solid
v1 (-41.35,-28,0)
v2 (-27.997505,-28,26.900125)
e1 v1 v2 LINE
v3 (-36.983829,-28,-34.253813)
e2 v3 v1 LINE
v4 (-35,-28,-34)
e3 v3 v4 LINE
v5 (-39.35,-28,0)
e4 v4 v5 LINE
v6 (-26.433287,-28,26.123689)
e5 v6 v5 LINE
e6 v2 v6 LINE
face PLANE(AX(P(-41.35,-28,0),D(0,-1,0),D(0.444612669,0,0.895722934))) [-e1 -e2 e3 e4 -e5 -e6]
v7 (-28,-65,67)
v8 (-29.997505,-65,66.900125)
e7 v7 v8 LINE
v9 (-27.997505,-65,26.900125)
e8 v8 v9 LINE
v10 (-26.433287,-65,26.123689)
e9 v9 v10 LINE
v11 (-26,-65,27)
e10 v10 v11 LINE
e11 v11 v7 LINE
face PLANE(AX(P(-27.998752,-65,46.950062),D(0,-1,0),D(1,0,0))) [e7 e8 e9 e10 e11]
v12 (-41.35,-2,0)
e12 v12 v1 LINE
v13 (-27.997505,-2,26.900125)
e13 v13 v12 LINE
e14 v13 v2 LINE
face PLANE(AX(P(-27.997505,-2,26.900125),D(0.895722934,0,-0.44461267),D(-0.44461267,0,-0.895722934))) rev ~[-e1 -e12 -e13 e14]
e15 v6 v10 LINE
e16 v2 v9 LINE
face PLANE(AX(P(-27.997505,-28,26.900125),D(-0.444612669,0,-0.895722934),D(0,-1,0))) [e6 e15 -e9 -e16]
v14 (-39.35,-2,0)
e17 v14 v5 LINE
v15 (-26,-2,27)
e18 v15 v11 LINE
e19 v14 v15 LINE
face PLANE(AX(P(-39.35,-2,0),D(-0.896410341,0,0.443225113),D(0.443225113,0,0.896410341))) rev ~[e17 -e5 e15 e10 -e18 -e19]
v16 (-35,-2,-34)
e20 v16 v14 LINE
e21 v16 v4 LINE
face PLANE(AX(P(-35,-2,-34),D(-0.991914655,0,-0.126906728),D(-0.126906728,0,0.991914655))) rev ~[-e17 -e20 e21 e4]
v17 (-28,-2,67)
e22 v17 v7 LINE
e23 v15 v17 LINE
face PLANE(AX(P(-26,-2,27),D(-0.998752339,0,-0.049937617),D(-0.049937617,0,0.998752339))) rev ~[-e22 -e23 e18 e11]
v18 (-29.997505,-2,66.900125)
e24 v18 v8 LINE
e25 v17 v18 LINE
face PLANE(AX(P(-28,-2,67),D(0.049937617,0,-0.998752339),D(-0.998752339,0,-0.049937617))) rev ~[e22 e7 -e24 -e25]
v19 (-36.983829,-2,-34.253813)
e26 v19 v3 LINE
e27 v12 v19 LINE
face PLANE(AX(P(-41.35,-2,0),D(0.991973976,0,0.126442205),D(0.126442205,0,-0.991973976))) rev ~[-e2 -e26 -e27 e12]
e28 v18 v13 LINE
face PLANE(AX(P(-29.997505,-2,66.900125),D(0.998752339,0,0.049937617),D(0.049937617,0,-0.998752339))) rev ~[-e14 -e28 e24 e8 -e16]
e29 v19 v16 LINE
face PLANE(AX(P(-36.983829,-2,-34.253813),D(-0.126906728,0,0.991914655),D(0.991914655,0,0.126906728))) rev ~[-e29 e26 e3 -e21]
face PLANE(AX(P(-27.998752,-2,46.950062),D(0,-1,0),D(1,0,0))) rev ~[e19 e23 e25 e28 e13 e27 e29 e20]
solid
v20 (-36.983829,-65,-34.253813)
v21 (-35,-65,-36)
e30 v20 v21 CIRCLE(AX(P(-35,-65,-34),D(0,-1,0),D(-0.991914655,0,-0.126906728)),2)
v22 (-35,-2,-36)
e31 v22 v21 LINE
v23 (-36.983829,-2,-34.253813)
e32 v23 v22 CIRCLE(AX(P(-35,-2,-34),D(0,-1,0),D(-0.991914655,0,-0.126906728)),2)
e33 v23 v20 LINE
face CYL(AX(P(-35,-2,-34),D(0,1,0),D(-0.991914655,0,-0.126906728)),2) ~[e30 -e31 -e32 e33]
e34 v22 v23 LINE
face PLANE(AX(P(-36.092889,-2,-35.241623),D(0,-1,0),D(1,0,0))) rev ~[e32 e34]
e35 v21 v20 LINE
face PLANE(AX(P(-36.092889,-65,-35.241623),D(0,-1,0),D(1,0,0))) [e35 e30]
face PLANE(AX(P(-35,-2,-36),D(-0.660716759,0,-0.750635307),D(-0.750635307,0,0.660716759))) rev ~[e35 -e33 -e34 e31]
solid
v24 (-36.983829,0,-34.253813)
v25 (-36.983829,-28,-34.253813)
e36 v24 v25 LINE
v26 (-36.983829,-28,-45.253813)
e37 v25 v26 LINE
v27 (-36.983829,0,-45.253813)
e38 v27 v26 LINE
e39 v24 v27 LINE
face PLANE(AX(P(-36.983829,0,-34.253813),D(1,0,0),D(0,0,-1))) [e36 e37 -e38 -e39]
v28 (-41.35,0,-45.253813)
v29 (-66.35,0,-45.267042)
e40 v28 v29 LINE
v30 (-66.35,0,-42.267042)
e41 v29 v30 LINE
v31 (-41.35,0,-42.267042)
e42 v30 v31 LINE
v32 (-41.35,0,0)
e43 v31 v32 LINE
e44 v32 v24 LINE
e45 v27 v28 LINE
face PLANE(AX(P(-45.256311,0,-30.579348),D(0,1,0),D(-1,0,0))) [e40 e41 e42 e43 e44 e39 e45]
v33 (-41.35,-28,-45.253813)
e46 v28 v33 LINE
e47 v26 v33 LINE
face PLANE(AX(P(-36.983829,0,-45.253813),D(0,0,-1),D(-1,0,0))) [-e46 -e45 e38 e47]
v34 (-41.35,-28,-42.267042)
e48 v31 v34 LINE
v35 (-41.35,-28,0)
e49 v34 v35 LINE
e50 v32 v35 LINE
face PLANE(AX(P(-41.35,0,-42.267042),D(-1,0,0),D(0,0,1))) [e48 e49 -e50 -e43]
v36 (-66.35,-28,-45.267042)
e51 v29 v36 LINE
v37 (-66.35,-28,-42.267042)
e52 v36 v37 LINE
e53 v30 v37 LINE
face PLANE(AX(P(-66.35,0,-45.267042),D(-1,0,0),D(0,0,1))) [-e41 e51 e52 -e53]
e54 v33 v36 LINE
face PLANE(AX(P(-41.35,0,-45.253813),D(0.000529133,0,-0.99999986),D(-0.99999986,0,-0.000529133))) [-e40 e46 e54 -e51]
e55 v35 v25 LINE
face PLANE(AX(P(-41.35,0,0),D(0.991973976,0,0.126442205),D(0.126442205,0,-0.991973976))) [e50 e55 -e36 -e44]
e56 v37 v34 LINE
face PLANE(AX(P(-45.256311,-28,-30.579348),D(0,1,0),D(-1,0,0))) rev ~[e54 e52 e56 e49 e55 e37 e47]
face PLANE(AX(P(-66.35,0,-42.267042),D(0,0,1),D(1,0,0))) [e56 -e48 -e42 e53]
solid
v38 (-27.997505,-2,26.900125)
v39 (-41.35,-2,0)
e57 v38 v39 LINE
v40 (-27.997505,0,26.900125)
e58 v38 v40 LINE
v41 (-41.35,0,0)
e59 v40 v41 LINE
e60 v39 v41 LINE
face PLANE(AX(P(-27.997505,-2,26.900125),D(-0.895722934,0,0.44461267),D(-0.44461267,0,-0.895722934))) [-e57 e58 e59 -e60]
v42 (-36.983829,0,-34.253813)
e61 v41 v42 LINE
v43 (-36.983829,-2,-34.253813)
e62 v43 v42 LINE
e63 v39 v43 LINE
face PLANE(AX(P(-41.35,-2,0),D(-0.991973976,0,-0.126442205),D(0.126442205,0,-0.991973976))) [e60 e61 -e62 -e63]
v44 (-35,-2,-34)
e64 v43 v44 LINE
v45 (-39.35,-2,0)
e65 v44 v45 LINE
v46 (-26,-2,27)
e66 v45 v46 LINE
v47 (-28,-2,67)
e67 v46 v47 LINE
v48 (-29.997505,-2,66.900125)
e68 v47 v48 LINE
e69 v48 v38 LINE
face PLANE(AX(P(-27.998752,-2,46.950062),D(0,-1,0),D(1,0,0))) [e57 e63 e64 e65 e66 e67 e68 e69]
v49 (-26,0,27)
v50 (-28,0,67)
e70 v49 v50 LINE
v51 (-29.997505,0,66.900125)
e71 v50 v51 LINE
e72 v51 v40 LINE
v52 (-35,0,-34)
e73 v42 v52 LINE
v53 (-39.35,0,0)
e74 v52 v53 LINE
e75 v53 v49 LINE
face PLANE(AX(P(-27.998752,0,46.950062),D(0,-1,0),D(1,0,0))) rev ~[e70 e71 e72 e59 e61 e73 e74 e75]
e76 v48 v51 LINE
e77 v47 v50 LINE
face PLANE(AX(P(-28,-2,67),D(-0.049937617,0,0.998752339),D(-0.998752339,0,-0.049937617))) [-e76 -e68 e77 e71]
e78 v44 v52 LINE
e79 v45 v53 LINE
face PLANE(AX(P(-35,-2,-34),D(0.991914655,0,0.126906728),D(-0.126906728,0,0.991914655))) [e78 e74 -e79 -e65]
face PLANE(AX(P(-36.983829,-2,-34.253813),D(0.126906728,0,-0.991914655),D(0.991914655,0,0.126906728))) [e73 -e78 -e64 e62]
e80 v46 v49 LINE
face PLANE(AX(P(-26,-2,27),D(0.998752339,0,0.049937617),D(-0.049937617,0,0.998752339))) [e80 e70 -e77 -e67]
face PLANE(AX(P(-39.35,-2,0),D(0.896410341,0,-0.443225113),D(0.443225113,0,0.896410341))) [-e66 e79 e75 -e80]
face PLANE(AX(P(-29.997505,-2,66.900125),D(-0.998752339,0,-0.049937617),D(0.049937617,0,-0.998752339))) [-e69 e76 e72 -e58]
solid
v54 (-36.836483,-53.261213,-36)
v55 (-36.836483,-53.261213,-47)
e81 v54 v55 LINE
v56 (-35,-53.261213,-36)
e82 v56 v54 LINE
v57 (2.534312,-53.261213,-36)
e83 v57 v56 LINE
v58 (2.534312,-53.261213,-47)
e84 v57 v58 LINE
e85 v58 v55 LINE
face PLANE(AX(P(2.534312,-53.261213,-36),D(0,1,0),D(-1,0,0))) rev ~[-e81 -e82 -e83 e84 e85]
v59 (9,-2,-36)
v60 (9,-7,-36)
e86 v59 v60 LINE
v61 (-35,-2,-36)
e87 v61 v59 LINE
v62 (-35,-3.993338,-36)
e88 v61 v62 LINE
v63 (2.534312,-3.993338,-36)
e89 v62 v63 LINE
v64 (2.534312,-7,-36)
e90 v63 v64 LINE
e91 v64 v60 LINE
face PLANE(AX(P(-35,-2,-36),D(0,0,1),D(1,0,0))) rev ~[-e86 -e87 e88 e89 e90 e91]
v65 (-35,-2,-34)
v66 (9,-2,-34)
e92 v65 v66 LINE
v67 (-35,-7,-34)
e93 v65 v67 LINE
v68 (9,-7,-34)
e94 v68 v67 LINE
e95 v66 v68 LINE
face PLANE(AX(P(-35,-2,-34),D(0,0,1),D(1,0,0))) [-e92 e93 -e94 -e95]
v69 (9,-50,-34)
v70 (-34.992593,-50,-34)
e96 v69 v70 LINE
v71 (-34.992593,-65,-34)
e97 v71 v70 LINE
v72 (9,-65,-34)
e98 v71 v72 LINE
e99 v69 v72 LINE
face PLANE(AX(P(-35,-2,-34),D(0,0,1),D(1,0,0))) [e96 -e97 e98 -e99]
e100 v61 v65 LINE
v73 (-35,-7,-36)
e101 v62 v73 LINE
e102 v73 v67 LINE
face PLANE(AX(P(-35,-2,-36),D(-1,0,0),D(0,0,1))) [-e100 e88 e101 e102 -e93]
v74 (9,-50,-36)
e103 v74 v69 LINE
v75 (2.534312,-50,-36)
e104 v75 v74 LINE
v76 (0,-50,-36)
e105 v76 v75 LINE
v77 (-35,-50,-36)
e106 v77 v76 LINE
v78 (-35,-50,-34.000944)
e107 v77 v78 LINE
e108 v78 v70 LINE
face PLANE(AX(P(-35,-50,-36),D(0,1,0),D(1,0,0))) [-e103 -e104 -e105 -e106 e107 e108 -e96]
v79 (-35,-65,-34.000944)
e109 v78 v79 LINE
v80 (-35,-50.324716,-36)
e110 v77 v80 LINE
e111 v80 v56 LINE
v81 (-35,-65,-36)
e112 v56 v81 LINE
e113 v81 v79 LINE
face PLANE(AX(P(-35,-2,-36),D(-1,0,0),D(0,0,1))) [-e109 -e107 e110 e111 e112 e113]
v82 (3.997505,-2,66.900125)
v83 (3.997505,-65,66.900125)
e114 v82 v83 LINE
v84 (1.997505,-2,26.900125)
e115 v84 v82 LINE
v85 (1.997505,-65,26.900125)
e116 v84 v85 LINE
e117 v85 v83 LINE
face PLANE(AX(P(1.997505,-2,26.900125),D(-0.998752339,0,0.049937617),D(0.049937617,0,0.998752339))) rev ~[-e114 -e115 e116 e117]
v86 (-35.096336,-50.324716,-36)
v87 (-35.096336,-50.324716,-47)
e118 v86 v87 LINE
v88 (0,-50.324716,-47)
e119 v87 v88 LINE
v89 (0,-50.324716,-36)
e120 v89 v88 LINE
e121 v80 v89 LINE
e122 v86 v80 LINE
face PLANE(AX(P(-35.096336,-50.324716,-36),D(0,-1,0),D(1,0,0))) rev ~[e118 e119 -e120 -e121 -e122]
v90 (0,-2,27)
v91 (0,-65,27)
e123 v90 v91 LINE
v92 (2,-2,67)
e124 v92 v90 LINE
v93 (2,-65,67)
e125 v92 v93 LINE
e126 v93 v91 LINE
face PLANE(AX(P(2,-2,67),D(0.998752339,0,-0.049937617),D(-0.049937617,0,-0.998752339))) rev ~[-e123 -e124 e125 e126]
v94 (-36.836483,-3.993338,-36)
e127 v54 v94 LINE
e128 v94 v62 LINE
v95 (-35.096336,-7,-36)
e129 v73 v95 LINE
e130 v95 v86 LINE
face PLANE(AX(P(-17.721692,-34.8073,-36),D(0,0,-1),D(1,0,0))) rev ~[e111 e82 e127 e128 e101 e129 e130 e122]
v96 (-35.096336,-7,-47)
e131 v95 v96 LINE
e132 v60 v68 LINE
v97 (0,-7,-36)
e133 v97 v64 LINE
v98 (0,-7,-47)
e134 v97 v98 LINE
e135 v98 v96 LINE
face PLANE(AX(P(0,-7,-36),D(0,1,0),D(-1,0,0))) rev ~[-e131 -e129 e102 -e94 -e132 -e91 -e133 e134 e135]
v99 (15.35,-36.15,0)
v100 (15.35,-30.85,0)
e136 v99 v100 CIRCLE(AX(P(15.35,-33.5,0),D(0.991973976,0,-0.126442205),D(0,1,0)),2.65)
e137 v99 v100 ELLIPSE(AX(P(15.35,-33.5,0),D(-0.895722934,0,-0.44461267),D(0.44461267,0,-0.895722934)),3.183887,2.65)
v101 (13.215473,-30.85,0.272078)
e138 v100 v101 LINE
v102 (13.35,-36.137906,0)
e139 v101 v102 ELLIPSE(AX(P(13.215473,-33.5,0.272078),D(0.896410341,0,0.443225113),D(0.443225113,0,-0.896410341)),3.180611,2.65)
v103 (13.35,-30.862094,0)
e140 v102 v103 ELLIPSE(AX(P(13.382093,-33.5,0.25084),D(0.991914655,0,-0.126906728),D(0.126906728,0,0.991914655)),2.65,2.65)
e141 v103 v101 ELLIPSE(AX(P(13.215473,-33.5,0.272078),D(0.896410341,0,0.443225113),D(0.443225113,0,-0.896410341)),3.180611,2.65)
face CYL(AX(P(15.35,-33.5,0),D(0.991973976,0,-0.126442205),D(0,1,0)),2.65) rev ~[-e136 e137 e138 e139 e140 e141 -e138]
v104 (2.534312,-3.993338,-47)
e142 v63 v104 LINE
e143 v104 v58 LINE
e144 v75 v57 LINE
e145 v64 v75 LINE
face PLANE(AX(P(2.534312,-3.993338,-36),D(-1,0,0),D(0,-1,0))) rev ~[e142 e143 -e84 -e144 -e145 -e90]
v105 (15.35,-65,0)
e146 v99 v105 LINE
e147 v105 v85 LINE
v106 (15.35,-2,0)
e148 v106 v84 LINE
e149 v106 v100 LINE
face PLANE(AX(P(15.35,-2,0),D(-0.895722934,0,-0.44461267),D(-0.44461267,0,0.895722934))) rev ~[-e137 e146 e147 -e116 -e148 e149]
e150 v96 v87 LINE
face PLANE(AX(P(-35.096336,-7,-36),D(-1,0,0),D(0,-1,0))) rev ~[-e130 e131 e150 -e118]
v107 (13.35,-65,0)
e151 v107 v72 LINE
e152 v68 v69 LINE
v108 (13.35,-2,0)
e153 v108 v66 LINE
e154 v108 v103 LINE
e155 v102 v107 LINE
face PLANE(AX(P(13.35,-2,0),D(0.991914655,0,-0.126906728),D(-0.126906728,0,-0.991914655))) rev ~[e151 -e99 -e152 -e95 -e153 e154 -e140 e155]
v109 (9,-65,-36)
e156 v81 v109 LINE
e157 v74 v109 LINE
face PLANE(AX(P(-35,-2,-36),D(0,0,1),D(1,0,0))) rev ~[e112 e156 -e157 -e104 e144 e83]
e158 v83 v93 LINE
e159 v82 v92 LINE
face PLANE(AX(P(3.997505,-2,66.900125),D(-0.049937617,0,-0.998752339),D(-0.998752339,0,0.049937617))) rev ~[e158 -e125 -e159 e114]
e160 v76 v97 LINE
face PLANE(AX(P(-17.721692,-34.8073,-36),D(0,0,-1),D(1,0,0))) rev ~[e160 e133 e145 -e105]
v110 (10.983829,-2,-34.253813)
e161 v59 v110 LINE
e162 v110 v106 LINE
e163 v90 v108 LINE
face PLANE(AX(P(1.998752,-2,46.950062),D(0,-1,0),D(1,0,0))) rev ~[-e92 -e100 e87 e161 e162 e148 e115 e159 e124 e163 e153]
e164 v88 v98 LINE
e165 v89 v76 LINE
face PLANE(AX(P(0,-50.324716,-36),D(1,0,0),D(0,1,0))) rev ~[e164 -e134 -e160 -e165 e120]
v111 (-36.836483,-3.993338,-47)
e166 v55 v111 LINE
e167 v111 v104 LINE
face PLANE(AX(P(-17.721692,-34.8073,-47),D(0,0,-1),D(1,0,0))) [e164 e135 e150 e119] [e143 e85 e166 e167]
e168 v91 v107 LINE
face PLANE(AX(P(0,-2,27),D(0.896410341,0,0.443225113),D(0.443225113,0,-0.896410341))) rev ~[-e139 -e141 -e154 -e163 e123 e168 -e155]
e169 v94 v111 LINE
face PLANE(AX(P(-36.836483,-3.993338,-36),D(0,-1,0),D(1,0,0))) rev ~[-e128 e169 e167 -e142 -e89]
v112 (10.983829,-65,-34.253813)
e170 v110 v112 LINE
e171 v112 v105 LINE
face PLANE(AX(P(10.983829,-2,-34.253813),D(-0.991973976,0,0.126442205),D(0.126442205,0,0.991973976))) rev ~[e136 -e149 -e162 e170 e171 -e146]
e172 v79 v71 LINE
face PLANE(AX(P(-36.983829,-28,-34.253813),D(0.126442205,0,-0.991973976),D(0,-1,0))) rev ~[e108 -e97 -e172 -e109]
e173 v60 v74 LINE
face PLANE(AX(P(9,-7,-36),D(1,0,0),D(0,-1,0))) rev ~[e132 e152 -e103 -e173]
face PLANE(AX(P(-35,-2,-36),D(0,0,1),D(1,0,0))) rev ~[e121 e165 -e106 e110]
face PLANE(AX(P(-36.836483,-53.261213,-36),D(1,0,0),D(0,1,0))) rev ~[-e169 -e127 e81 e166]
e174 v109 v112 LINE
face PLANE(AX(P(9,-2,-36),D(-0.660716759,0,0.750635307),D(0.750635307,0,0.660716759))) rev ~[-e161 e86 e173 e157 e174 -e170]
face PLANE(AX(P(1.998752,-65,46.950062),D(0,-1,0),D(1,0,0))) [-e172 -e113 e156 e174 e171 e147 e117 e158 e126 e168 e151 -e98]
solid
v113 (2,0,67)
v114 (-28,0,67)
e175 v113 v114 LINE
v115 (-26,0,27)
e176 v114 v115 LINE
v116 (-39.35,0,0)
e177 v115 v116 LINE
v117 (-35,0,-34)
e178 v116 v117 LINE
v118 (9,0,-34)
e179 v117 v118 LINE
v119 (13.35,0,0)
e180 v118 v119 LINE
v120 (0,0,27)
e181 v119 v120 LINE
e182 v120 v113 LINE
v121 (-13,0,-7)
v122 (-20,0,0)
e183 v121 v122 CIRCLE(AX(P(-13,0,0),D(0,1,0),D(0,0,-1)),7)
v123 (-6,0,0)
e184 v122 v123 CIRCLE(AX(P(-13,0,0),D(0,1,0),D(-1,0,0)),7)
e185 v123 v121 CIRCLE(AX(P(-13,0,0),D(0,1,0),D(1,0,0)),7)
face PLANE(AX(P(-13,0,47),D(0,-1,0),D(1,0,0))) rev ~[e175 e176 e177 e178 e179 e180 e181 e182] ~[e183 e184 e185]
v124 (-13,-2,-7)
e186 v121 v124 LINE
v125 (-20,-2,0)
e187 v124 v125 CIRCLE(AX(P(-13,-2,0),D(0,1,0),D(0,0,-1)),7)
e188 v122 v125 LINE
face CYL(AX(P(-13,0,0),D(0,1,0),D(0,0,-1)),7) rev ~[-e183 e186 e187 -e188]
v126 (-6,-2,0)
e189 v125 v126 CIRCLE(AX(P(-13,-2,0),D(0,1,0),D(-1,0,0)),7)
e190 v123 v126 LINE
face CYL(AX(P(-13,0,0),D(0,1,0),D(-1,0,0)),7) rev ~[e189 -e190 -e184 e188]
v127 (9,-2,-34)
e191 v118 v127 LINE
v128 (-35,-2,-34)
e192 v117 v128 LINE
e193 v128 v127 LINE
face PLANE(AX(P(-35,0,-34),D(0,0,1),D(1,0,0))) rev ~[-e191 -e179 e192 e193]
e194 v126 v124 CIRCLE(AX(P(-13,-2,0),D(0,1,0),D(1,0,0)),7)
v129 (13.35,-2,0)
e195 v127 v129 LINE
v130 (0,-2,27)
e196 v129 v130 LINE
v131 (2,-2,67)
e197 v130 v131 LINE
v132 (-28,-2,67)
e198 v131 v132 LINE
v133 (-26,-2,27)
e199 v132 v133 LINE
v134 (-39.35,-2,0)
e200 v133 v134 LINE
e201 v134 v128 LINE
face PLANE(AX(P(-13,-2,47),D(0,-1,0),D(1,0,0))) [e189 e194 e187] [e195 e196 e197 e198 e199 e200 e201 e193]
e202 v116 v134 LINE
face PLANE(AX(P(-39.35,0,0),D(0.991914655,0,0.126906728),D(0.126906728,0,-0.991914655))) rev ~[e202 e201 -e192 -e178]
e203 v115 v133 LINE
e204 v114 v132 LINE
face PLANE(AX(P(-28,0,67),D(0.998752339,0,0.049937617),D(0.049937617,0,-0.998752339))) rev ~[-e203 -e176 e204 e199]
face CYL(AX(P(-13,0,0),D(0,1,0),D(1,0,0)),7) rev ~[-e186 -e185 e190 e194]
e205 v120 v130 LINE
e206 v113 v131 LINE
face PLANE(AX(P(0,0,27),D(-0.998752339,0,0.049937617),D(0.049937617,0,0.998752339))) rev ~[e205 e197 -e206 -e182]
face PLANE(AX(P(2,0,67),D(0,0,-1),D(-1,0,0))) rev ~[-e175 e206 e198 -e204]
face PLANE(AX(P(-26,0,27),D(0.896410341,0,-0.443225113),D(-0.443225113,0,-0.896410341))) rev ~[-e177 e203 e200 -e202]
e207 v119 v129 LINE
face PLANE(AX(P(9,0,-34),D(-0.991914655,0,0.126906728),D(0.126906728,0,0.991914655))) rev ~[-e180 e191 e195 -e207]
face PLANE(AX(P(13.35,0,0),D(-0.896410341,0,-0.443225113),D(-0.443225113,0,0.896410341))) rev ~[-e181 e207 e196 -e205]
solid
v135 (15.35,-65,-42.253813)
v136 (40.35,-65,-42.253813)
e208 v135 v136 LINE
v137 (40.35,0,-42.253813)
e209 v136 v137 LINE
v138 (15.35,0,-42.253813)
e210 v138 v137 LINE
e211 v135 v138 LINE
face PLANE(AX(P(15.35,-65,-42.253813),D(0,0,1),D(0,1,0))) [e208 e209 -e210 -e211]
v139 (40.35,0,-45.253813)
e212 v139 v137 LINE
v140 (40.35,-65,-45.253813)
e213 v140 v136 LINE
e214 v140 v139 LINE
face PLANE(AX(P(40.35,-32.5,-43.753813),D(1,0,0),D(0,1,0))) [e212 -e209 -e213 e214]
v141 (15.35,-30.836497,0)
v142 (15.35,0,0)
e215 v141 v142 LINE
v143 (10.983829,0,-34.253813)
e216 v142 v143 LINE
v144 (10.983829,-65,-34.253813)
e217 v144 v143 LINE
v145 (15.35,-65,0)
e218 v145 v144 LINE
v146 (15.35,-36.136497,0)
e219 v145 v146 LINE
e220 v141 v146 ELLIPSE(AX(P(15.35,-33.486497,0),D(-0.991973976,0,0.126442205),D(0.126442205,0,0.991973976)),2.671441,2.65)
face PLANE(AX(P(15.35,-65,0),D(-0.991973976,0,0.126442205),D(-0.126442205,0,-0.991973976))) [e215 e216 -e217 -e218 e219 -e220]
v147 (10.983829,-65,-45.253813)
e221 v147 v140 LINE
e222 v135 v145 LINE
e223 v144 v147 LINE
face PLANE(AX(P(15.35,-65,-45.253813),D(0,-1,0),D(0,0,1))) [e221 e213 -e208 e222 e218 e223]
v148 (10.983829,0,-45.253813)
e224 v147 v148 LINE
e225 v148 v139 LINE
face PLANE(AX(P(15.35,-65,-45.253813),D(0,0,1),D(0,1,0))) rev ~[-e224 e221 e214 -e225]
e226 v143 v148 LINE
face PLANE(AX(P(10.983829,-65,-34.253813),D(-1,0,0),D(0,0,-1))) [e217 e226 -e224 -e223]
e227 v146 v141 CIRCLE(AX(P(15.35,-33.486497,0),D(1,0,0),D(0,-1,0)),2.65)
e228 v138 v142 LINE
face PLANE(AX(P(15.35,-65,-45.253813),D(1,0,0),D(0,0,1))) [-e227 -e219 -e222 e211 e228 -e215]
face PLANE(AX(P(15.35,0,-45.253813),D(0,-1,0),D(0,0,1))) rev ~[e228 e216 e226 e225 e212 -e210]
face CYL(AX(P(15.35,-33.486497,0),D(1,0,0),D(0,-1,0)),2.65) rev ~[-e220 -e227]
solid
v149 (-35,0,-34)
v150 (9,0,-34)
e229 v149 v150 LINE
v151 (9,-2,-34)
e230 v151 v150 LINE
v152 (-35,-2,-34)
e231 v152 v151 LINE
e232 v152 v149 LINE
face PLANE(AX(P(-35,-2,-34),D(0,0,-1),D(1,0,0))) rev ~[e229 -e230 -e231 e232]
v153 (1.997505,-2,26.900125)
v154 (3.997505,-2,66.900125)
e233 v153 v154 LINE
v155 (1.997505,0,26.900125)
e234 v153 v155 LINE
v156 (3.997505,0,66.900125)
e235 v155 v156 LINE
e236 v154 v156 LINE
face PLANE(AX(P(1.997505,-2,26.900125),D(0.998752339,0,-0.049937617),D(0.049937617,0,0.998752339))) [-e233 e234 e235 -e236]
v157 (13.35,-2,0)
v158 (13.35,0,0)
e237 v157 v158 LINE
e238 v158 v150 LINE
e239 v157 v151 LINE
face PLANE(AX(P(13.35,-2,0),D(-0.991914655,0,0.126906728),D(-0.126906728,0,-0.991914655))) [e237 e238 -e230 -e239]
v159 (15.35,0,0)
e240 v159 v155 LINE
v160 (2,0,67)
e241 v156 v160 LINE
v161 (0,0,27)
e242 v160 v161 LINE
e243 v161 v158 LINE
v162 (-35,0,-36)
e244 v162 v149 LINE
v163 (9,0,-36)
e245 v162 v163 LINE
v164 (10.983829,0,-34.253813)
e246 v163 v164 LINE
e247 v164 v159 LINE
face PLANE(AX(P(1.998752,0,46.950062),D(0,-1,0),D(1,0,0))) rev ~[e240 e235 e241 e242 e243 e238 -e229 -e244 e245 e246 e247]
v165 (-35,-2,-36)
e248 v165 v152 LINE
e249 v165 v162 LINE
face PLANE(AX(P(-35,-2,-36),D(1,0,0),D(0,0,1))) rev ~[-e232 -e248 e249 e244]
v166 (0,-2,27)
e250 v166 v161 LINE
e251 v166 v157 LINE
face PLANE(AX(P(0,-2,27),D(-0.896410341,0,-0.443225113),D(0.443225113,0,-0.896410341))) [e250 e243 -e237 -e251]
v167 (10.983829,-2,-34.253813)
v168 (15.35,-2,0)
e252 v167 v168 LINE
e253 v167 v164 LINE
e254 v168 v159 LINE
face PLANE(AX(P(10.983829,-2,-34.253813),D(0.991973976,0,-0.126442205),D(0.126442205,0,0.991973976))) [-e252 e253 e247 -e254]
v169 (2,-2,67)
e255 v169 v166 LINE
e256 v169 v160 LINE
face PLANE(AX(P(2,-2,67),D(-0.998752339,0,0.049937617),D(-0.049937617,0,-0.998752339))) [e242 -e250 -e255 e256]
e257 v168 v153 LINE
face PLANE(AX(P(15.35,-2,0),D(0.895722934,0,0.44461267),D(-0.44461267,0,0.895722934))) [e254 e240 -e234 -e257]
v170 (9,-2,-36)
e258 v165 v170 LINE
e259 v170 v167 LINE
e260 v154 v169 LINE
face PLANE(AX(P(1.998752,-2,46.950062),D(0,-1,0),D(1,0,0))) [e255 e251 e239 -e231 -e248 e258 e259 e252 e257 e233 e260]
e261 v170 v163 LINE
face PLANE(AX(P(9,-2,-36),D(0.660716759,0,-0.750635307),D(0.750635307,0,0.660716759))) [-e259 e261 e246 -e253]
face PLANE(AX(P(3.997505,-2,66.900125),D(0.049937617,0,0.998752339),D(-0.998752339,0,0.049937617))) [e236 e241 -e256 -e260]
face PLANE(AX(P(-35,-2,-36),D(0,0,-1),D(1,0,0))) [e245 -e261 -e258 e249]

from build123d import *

# Parameters (mm, degrees)
F0_W      = 26
F0_H      = 40
F1_DEPTH  = 2
F3_DEPTH  = 63
F2_W      = 44
F2_H      = 2
F4_DEPTH  = 2
F5_W      = 37
F5_H      = 30.0317472646
F6_DEPTH  = 3
F7_W      = 37
F7_H      = 34.5309597718
F8_DEPTH  = 3
F10_DEPTH = 5
F12_DEPTH = 65
F13_W     = 65
F13_H     = 3
F14_DEPTH = 25
F16_DEPTH = 28
F18_DEPTH = 5
F19_W     = 44
F19_H     = 43
F20_DEPTH = 3
F22_DEPTH = 11


# Not quite as in the source:
# - a feature names something its author has since deleted; it is built from what else it names


with BuildPart() as f1:
    # F0 (on Front) → F1 (new body)
    with BuildSketch(Plane.XZ):
        with Locations((-13, 47)):
            Rectangle(F0_W, F0_H)
        Polygon((-28, 67), (-26, 27), (-26, 67), align=None)
        Polygon((0, 67), (0, 27), (2, 67), align=None)
        with BuildLine():
            Line((-6, 0), (0, 0))
            Line((0, 0), (0, 27))
            Line((0, 27), (-26, 27))
            Line((-26, 27), (-26, 0))
            Line((-26, 0), (-20, 0))
            ThreePointArc((-20, 0), (-13, 7), (-6, 0))
        make_face()
        Polygon((-26, 0), (-26, 27), (-39.35, 0), align=None)
        Polygon((0, 27), (0, 0), (13.35, 0), align=None)
        Polygon((13.35, 0), (0, 0), (0, -34), (9, -34), align=None)
        with BuildLine():
            ThreePointArc((-13, -7), (-17.9497474683, -4.9497474683), (-20, 0))
            Line((-20, 0), (-26, 0))
            Line((-26, 0), (-26, -34))
            Line((-26, -34), (-13, -34))
            Line((-13, -34), (-13, -7))
        make_face()
        Polygon((-26, -34), (-26, 0), (-39.35, 0), (-35, -34), align=None)
        with BuildLine():
            Line((0, -34), (0, 0))
            Line((0, 0), (-6, 0))
            ThreePointArc((-6, 0), (-8.0502525317, -4.9497474683), (-13, -7))
            Line((-13, -7), (-13, -34))
            Line((-13, -34), (0, -34))
        make_face()
    extrude(amount=F1_DEPTH)


with BuildPart() as f3:
    # F2 (on face) → F3 (new body)
    with BuildSketch(Plane.XZ.offset(2)):
        Polygon((-26, 27), (-28, 67), (-29.9975046778, 66.9001247661), (-27.9975046778, 26.9001247661), align=None)
        Polygon((-39.35, 0), (-26, 27), (-27.9975046778, 26.9001247661), (-41.35, 0), align=None)
        Polygon((-35, -34), (-39.35, 0), (-41.35, 0), (-36.9838293096, -34.2538134558), align=None)
    extrude(amount=F3_DEPTH)


with BuildPart() as f3b:
    # F2 (on face) → F3, piece 2 (new body)
    with BuildSketch(Plane.XZ.offset(2)):
        Polygon((3.9975046778, 66.9001247661), (2, 67), (0, 27), (1.9975046778, 26.9001247661), align=None)
        Polygon((1.9975046778, 26.9001247661), (0, 27), (13.35, 0), (15.35, 0), align=None)
        Polygon((15.35, 0), (13.35, 0), (9, -34), (10.9838293096, -34.2538134558), align=None)
        with Locations((-13, -35)):
            Rectangle(F2_W, F2_H)
        Polygon((10.9838293096, -34.2538134558), (9, -34), (9, -36), align=None)
    extrude(amount=F3_DEPTH)


with BuildPart() as f3c:
    # F2 (on face) → F3, piece 3 (new body)
    with BuildSketch(Plane.XZ.offset(2)):
        with BuildLine():
            Line((-35, -36), (-36.9838293096, -34.2538134558))
            ThreePointArc((-36.9838293096, -34.2538134558), (-36.3214335187, -35.5012706138), (-35, -36))
        make_face()
    extrude(amount=F3_DEPTH)


with BuildPart() as f4:
    # F4 (new): a face of the model
    f4_faces = [f3b.part.faces().sort_by_distance(p)[0] for p in [
        (1.8524568997, -2, 46.957377155),
    ]]
    extrude(f4_faces, amount=F4_DEPTH)


with BuildPart() as f4b:
    # F4#2 (new): a face of the model
    f4_2_faces = [f3.part.faces().sort_by_distance(p)[0] for p in [
        (-32.9556846535, -2, 16.3675041089),
    ]]
    extrude(f4_2_faces, amount=F4_DEPTH)


with BuildPart() as f3_1:
    add(f3.part)

    # F5 (on face) → F6 (cut)
    with BuildSketch(Plane(origin=(-33.1759143884, 0, 16.4676277725), x_dir=(0, -1, 0), z_dir=(-0.8957229338, 0, 0.4446126695))):
        with Locations((46.5, -3.3688602532)):
            Rectangle(F5_W, F5_H)
    extrude(amount=-F6_DEPTH, mode=Mode.SUBTRACT)


with BuildPart() as f8_tool:
    # F7 (on face) → F8 (new body)
    with BuildSketch(Plane(origin=(-40.6889114508, 0, -5.1864220266), x_dir=(0, -1, 0), z_dir=(-0.9919739759, 0, -0.1264422049))):
        with Locations((46.5, -12.0370947138)):
            Rectangle(F7_W, F7_H)
    extrude(amount=-F8_DEPTH)


with BuildPart() as f3_2:
    add(f3_1.part)

    # F8: cut by f8_tool
    add(f8_tool.part, mode=Mode.SUBTRACT)


with BuildPart() as f3b_1:
    add(f3b.part)

    # F8: cut by f8_tool
    add(f8_tool.part, mode=Mode.SUBTRACT)

    # F9 (on face) → F10 (cut)
    with BuildSketch(Plane(origin=(15.1045898614, 0, -1.9253102323), x_dir=(0, 1, 0), z_dir=(0.9919739759, 0, -0.1264422049))):
        with BuildLine():
            ThreePointArc((-36.15, 1.940887845), (-33.5, -0.709112155), (-30.85, 1.940887845))
            Line((-30.85, 1.940887845), (-36.15, 1.940887845))
        make_face()
        with BuildLine():
            Line((-36.15, 1.940887845), (-30.85, 1.940887845))
            ThreePointArc((-30.85, 1.940887845), (-33.5, 4.590887845), (-36.15, 1.940887845))
        make_face()
    extrude(amount=-F10_DEPTH, mode=Mode.SUBTRACT)

    # F19 (on face) → F20 (cut)
    with BuildSketch(Plane(origin=(0, 0, -36), x_dir=(1, 0, 0), z_dir=(0, 0, -1))):
        with Locations((-13, 28.5)):
            Rectangle(F19_W, F19_H)
    extrude(amount=-F20_DEPTH, mode=Mode.SUBTRACT)

    # F21 (on face) → F22 (join)
    with BuildSketch(Plane(origin=(0, 0, -36), x_dir=(1, 0, 0), z_dir=(0, 0, -1))):
        Polygon((-35.0963361561, 7), (-35.0963361561, 50.3247156739), (0, 50.3247156739), (0, 7), (2.5343124289, 7), (2.5343124289, 53.2612130046), (-36.8364825845, 53.2612130046), (-36.8364825845, 3.993337974), (-35, 3.993337974), (-35, 7), align=None)
        Polygon((2.5343124289, 7), (0, 7), (-35, 7), (-35, 3.993337974), (2.5343124289, 3.993337974), align=None)
    extrude(amount=F22_DEPTH)


with BuildPart() as f12:
    # F11 (on face) → F12 (new body)
    with BuildSketch(Plane.XZ.offset(65)):
        Polygon((15.35, -45.2538134558), (15.35, 0), (10.9838293096, -34.2538134558), (10.9838293096, -45.2538134558), align=None)
    extrude(amount=-F12_DEPTH)

    # F13 (on face) → F14 (join)
    with BuildSketch(Plane.YZ.offset(15.35)):
        with Locations((-32.5, -43.7538134558)):
            Rectangle(F13_W, F13_H)
    extrude(amount=F14_DEPTH)

    # F17 (on face) → F18 (cut)
    with BuildSketch(Plane.YZ.offset(15.35)):
        with BuildLine():
            Line((-36.1364966571, 0), (-30.8364966571, 0))
            ThreePointArc((-30.8364966571, 0), (-33.4864966571, 2.65), (-36.1364966571, 0))
        make_face()
        with BuildLine():
            ThreePointArc((-36.1364966571, 0), (-33.4864966571, -2.65), (-30.8364966571, 0))
            Line((-30.8364966571, 0), (-36.1364966571, 0))
        make_face()
    extrude(amount=-F18_DEPTH, mode=Mode.SUBTRACT)


with BuildPart() as f16:
    # F15 (on face) → F16 (new body)
    with BuildSketch(Plane(origin=(0, 0, 0), x_dir=(-1, 0, 0), z_dir=(0, 1, 0))):
        Polygon((41.35, -42.2670417726), (41.35, 0), (36.9838293096, -34.2538134558), (36.9838293096, -45.2538134558), (41.35, -45.2538134558), (66.35, -45.2670417726), (66.35, -42.2670417726), align=None)
    extrude(amount=-F16_DEPTH)


solid = Compound([f1.part, f3c.part, f4.part, f4b.part, f3_2.part, f3b_1.part, f12.part, f16.part])
